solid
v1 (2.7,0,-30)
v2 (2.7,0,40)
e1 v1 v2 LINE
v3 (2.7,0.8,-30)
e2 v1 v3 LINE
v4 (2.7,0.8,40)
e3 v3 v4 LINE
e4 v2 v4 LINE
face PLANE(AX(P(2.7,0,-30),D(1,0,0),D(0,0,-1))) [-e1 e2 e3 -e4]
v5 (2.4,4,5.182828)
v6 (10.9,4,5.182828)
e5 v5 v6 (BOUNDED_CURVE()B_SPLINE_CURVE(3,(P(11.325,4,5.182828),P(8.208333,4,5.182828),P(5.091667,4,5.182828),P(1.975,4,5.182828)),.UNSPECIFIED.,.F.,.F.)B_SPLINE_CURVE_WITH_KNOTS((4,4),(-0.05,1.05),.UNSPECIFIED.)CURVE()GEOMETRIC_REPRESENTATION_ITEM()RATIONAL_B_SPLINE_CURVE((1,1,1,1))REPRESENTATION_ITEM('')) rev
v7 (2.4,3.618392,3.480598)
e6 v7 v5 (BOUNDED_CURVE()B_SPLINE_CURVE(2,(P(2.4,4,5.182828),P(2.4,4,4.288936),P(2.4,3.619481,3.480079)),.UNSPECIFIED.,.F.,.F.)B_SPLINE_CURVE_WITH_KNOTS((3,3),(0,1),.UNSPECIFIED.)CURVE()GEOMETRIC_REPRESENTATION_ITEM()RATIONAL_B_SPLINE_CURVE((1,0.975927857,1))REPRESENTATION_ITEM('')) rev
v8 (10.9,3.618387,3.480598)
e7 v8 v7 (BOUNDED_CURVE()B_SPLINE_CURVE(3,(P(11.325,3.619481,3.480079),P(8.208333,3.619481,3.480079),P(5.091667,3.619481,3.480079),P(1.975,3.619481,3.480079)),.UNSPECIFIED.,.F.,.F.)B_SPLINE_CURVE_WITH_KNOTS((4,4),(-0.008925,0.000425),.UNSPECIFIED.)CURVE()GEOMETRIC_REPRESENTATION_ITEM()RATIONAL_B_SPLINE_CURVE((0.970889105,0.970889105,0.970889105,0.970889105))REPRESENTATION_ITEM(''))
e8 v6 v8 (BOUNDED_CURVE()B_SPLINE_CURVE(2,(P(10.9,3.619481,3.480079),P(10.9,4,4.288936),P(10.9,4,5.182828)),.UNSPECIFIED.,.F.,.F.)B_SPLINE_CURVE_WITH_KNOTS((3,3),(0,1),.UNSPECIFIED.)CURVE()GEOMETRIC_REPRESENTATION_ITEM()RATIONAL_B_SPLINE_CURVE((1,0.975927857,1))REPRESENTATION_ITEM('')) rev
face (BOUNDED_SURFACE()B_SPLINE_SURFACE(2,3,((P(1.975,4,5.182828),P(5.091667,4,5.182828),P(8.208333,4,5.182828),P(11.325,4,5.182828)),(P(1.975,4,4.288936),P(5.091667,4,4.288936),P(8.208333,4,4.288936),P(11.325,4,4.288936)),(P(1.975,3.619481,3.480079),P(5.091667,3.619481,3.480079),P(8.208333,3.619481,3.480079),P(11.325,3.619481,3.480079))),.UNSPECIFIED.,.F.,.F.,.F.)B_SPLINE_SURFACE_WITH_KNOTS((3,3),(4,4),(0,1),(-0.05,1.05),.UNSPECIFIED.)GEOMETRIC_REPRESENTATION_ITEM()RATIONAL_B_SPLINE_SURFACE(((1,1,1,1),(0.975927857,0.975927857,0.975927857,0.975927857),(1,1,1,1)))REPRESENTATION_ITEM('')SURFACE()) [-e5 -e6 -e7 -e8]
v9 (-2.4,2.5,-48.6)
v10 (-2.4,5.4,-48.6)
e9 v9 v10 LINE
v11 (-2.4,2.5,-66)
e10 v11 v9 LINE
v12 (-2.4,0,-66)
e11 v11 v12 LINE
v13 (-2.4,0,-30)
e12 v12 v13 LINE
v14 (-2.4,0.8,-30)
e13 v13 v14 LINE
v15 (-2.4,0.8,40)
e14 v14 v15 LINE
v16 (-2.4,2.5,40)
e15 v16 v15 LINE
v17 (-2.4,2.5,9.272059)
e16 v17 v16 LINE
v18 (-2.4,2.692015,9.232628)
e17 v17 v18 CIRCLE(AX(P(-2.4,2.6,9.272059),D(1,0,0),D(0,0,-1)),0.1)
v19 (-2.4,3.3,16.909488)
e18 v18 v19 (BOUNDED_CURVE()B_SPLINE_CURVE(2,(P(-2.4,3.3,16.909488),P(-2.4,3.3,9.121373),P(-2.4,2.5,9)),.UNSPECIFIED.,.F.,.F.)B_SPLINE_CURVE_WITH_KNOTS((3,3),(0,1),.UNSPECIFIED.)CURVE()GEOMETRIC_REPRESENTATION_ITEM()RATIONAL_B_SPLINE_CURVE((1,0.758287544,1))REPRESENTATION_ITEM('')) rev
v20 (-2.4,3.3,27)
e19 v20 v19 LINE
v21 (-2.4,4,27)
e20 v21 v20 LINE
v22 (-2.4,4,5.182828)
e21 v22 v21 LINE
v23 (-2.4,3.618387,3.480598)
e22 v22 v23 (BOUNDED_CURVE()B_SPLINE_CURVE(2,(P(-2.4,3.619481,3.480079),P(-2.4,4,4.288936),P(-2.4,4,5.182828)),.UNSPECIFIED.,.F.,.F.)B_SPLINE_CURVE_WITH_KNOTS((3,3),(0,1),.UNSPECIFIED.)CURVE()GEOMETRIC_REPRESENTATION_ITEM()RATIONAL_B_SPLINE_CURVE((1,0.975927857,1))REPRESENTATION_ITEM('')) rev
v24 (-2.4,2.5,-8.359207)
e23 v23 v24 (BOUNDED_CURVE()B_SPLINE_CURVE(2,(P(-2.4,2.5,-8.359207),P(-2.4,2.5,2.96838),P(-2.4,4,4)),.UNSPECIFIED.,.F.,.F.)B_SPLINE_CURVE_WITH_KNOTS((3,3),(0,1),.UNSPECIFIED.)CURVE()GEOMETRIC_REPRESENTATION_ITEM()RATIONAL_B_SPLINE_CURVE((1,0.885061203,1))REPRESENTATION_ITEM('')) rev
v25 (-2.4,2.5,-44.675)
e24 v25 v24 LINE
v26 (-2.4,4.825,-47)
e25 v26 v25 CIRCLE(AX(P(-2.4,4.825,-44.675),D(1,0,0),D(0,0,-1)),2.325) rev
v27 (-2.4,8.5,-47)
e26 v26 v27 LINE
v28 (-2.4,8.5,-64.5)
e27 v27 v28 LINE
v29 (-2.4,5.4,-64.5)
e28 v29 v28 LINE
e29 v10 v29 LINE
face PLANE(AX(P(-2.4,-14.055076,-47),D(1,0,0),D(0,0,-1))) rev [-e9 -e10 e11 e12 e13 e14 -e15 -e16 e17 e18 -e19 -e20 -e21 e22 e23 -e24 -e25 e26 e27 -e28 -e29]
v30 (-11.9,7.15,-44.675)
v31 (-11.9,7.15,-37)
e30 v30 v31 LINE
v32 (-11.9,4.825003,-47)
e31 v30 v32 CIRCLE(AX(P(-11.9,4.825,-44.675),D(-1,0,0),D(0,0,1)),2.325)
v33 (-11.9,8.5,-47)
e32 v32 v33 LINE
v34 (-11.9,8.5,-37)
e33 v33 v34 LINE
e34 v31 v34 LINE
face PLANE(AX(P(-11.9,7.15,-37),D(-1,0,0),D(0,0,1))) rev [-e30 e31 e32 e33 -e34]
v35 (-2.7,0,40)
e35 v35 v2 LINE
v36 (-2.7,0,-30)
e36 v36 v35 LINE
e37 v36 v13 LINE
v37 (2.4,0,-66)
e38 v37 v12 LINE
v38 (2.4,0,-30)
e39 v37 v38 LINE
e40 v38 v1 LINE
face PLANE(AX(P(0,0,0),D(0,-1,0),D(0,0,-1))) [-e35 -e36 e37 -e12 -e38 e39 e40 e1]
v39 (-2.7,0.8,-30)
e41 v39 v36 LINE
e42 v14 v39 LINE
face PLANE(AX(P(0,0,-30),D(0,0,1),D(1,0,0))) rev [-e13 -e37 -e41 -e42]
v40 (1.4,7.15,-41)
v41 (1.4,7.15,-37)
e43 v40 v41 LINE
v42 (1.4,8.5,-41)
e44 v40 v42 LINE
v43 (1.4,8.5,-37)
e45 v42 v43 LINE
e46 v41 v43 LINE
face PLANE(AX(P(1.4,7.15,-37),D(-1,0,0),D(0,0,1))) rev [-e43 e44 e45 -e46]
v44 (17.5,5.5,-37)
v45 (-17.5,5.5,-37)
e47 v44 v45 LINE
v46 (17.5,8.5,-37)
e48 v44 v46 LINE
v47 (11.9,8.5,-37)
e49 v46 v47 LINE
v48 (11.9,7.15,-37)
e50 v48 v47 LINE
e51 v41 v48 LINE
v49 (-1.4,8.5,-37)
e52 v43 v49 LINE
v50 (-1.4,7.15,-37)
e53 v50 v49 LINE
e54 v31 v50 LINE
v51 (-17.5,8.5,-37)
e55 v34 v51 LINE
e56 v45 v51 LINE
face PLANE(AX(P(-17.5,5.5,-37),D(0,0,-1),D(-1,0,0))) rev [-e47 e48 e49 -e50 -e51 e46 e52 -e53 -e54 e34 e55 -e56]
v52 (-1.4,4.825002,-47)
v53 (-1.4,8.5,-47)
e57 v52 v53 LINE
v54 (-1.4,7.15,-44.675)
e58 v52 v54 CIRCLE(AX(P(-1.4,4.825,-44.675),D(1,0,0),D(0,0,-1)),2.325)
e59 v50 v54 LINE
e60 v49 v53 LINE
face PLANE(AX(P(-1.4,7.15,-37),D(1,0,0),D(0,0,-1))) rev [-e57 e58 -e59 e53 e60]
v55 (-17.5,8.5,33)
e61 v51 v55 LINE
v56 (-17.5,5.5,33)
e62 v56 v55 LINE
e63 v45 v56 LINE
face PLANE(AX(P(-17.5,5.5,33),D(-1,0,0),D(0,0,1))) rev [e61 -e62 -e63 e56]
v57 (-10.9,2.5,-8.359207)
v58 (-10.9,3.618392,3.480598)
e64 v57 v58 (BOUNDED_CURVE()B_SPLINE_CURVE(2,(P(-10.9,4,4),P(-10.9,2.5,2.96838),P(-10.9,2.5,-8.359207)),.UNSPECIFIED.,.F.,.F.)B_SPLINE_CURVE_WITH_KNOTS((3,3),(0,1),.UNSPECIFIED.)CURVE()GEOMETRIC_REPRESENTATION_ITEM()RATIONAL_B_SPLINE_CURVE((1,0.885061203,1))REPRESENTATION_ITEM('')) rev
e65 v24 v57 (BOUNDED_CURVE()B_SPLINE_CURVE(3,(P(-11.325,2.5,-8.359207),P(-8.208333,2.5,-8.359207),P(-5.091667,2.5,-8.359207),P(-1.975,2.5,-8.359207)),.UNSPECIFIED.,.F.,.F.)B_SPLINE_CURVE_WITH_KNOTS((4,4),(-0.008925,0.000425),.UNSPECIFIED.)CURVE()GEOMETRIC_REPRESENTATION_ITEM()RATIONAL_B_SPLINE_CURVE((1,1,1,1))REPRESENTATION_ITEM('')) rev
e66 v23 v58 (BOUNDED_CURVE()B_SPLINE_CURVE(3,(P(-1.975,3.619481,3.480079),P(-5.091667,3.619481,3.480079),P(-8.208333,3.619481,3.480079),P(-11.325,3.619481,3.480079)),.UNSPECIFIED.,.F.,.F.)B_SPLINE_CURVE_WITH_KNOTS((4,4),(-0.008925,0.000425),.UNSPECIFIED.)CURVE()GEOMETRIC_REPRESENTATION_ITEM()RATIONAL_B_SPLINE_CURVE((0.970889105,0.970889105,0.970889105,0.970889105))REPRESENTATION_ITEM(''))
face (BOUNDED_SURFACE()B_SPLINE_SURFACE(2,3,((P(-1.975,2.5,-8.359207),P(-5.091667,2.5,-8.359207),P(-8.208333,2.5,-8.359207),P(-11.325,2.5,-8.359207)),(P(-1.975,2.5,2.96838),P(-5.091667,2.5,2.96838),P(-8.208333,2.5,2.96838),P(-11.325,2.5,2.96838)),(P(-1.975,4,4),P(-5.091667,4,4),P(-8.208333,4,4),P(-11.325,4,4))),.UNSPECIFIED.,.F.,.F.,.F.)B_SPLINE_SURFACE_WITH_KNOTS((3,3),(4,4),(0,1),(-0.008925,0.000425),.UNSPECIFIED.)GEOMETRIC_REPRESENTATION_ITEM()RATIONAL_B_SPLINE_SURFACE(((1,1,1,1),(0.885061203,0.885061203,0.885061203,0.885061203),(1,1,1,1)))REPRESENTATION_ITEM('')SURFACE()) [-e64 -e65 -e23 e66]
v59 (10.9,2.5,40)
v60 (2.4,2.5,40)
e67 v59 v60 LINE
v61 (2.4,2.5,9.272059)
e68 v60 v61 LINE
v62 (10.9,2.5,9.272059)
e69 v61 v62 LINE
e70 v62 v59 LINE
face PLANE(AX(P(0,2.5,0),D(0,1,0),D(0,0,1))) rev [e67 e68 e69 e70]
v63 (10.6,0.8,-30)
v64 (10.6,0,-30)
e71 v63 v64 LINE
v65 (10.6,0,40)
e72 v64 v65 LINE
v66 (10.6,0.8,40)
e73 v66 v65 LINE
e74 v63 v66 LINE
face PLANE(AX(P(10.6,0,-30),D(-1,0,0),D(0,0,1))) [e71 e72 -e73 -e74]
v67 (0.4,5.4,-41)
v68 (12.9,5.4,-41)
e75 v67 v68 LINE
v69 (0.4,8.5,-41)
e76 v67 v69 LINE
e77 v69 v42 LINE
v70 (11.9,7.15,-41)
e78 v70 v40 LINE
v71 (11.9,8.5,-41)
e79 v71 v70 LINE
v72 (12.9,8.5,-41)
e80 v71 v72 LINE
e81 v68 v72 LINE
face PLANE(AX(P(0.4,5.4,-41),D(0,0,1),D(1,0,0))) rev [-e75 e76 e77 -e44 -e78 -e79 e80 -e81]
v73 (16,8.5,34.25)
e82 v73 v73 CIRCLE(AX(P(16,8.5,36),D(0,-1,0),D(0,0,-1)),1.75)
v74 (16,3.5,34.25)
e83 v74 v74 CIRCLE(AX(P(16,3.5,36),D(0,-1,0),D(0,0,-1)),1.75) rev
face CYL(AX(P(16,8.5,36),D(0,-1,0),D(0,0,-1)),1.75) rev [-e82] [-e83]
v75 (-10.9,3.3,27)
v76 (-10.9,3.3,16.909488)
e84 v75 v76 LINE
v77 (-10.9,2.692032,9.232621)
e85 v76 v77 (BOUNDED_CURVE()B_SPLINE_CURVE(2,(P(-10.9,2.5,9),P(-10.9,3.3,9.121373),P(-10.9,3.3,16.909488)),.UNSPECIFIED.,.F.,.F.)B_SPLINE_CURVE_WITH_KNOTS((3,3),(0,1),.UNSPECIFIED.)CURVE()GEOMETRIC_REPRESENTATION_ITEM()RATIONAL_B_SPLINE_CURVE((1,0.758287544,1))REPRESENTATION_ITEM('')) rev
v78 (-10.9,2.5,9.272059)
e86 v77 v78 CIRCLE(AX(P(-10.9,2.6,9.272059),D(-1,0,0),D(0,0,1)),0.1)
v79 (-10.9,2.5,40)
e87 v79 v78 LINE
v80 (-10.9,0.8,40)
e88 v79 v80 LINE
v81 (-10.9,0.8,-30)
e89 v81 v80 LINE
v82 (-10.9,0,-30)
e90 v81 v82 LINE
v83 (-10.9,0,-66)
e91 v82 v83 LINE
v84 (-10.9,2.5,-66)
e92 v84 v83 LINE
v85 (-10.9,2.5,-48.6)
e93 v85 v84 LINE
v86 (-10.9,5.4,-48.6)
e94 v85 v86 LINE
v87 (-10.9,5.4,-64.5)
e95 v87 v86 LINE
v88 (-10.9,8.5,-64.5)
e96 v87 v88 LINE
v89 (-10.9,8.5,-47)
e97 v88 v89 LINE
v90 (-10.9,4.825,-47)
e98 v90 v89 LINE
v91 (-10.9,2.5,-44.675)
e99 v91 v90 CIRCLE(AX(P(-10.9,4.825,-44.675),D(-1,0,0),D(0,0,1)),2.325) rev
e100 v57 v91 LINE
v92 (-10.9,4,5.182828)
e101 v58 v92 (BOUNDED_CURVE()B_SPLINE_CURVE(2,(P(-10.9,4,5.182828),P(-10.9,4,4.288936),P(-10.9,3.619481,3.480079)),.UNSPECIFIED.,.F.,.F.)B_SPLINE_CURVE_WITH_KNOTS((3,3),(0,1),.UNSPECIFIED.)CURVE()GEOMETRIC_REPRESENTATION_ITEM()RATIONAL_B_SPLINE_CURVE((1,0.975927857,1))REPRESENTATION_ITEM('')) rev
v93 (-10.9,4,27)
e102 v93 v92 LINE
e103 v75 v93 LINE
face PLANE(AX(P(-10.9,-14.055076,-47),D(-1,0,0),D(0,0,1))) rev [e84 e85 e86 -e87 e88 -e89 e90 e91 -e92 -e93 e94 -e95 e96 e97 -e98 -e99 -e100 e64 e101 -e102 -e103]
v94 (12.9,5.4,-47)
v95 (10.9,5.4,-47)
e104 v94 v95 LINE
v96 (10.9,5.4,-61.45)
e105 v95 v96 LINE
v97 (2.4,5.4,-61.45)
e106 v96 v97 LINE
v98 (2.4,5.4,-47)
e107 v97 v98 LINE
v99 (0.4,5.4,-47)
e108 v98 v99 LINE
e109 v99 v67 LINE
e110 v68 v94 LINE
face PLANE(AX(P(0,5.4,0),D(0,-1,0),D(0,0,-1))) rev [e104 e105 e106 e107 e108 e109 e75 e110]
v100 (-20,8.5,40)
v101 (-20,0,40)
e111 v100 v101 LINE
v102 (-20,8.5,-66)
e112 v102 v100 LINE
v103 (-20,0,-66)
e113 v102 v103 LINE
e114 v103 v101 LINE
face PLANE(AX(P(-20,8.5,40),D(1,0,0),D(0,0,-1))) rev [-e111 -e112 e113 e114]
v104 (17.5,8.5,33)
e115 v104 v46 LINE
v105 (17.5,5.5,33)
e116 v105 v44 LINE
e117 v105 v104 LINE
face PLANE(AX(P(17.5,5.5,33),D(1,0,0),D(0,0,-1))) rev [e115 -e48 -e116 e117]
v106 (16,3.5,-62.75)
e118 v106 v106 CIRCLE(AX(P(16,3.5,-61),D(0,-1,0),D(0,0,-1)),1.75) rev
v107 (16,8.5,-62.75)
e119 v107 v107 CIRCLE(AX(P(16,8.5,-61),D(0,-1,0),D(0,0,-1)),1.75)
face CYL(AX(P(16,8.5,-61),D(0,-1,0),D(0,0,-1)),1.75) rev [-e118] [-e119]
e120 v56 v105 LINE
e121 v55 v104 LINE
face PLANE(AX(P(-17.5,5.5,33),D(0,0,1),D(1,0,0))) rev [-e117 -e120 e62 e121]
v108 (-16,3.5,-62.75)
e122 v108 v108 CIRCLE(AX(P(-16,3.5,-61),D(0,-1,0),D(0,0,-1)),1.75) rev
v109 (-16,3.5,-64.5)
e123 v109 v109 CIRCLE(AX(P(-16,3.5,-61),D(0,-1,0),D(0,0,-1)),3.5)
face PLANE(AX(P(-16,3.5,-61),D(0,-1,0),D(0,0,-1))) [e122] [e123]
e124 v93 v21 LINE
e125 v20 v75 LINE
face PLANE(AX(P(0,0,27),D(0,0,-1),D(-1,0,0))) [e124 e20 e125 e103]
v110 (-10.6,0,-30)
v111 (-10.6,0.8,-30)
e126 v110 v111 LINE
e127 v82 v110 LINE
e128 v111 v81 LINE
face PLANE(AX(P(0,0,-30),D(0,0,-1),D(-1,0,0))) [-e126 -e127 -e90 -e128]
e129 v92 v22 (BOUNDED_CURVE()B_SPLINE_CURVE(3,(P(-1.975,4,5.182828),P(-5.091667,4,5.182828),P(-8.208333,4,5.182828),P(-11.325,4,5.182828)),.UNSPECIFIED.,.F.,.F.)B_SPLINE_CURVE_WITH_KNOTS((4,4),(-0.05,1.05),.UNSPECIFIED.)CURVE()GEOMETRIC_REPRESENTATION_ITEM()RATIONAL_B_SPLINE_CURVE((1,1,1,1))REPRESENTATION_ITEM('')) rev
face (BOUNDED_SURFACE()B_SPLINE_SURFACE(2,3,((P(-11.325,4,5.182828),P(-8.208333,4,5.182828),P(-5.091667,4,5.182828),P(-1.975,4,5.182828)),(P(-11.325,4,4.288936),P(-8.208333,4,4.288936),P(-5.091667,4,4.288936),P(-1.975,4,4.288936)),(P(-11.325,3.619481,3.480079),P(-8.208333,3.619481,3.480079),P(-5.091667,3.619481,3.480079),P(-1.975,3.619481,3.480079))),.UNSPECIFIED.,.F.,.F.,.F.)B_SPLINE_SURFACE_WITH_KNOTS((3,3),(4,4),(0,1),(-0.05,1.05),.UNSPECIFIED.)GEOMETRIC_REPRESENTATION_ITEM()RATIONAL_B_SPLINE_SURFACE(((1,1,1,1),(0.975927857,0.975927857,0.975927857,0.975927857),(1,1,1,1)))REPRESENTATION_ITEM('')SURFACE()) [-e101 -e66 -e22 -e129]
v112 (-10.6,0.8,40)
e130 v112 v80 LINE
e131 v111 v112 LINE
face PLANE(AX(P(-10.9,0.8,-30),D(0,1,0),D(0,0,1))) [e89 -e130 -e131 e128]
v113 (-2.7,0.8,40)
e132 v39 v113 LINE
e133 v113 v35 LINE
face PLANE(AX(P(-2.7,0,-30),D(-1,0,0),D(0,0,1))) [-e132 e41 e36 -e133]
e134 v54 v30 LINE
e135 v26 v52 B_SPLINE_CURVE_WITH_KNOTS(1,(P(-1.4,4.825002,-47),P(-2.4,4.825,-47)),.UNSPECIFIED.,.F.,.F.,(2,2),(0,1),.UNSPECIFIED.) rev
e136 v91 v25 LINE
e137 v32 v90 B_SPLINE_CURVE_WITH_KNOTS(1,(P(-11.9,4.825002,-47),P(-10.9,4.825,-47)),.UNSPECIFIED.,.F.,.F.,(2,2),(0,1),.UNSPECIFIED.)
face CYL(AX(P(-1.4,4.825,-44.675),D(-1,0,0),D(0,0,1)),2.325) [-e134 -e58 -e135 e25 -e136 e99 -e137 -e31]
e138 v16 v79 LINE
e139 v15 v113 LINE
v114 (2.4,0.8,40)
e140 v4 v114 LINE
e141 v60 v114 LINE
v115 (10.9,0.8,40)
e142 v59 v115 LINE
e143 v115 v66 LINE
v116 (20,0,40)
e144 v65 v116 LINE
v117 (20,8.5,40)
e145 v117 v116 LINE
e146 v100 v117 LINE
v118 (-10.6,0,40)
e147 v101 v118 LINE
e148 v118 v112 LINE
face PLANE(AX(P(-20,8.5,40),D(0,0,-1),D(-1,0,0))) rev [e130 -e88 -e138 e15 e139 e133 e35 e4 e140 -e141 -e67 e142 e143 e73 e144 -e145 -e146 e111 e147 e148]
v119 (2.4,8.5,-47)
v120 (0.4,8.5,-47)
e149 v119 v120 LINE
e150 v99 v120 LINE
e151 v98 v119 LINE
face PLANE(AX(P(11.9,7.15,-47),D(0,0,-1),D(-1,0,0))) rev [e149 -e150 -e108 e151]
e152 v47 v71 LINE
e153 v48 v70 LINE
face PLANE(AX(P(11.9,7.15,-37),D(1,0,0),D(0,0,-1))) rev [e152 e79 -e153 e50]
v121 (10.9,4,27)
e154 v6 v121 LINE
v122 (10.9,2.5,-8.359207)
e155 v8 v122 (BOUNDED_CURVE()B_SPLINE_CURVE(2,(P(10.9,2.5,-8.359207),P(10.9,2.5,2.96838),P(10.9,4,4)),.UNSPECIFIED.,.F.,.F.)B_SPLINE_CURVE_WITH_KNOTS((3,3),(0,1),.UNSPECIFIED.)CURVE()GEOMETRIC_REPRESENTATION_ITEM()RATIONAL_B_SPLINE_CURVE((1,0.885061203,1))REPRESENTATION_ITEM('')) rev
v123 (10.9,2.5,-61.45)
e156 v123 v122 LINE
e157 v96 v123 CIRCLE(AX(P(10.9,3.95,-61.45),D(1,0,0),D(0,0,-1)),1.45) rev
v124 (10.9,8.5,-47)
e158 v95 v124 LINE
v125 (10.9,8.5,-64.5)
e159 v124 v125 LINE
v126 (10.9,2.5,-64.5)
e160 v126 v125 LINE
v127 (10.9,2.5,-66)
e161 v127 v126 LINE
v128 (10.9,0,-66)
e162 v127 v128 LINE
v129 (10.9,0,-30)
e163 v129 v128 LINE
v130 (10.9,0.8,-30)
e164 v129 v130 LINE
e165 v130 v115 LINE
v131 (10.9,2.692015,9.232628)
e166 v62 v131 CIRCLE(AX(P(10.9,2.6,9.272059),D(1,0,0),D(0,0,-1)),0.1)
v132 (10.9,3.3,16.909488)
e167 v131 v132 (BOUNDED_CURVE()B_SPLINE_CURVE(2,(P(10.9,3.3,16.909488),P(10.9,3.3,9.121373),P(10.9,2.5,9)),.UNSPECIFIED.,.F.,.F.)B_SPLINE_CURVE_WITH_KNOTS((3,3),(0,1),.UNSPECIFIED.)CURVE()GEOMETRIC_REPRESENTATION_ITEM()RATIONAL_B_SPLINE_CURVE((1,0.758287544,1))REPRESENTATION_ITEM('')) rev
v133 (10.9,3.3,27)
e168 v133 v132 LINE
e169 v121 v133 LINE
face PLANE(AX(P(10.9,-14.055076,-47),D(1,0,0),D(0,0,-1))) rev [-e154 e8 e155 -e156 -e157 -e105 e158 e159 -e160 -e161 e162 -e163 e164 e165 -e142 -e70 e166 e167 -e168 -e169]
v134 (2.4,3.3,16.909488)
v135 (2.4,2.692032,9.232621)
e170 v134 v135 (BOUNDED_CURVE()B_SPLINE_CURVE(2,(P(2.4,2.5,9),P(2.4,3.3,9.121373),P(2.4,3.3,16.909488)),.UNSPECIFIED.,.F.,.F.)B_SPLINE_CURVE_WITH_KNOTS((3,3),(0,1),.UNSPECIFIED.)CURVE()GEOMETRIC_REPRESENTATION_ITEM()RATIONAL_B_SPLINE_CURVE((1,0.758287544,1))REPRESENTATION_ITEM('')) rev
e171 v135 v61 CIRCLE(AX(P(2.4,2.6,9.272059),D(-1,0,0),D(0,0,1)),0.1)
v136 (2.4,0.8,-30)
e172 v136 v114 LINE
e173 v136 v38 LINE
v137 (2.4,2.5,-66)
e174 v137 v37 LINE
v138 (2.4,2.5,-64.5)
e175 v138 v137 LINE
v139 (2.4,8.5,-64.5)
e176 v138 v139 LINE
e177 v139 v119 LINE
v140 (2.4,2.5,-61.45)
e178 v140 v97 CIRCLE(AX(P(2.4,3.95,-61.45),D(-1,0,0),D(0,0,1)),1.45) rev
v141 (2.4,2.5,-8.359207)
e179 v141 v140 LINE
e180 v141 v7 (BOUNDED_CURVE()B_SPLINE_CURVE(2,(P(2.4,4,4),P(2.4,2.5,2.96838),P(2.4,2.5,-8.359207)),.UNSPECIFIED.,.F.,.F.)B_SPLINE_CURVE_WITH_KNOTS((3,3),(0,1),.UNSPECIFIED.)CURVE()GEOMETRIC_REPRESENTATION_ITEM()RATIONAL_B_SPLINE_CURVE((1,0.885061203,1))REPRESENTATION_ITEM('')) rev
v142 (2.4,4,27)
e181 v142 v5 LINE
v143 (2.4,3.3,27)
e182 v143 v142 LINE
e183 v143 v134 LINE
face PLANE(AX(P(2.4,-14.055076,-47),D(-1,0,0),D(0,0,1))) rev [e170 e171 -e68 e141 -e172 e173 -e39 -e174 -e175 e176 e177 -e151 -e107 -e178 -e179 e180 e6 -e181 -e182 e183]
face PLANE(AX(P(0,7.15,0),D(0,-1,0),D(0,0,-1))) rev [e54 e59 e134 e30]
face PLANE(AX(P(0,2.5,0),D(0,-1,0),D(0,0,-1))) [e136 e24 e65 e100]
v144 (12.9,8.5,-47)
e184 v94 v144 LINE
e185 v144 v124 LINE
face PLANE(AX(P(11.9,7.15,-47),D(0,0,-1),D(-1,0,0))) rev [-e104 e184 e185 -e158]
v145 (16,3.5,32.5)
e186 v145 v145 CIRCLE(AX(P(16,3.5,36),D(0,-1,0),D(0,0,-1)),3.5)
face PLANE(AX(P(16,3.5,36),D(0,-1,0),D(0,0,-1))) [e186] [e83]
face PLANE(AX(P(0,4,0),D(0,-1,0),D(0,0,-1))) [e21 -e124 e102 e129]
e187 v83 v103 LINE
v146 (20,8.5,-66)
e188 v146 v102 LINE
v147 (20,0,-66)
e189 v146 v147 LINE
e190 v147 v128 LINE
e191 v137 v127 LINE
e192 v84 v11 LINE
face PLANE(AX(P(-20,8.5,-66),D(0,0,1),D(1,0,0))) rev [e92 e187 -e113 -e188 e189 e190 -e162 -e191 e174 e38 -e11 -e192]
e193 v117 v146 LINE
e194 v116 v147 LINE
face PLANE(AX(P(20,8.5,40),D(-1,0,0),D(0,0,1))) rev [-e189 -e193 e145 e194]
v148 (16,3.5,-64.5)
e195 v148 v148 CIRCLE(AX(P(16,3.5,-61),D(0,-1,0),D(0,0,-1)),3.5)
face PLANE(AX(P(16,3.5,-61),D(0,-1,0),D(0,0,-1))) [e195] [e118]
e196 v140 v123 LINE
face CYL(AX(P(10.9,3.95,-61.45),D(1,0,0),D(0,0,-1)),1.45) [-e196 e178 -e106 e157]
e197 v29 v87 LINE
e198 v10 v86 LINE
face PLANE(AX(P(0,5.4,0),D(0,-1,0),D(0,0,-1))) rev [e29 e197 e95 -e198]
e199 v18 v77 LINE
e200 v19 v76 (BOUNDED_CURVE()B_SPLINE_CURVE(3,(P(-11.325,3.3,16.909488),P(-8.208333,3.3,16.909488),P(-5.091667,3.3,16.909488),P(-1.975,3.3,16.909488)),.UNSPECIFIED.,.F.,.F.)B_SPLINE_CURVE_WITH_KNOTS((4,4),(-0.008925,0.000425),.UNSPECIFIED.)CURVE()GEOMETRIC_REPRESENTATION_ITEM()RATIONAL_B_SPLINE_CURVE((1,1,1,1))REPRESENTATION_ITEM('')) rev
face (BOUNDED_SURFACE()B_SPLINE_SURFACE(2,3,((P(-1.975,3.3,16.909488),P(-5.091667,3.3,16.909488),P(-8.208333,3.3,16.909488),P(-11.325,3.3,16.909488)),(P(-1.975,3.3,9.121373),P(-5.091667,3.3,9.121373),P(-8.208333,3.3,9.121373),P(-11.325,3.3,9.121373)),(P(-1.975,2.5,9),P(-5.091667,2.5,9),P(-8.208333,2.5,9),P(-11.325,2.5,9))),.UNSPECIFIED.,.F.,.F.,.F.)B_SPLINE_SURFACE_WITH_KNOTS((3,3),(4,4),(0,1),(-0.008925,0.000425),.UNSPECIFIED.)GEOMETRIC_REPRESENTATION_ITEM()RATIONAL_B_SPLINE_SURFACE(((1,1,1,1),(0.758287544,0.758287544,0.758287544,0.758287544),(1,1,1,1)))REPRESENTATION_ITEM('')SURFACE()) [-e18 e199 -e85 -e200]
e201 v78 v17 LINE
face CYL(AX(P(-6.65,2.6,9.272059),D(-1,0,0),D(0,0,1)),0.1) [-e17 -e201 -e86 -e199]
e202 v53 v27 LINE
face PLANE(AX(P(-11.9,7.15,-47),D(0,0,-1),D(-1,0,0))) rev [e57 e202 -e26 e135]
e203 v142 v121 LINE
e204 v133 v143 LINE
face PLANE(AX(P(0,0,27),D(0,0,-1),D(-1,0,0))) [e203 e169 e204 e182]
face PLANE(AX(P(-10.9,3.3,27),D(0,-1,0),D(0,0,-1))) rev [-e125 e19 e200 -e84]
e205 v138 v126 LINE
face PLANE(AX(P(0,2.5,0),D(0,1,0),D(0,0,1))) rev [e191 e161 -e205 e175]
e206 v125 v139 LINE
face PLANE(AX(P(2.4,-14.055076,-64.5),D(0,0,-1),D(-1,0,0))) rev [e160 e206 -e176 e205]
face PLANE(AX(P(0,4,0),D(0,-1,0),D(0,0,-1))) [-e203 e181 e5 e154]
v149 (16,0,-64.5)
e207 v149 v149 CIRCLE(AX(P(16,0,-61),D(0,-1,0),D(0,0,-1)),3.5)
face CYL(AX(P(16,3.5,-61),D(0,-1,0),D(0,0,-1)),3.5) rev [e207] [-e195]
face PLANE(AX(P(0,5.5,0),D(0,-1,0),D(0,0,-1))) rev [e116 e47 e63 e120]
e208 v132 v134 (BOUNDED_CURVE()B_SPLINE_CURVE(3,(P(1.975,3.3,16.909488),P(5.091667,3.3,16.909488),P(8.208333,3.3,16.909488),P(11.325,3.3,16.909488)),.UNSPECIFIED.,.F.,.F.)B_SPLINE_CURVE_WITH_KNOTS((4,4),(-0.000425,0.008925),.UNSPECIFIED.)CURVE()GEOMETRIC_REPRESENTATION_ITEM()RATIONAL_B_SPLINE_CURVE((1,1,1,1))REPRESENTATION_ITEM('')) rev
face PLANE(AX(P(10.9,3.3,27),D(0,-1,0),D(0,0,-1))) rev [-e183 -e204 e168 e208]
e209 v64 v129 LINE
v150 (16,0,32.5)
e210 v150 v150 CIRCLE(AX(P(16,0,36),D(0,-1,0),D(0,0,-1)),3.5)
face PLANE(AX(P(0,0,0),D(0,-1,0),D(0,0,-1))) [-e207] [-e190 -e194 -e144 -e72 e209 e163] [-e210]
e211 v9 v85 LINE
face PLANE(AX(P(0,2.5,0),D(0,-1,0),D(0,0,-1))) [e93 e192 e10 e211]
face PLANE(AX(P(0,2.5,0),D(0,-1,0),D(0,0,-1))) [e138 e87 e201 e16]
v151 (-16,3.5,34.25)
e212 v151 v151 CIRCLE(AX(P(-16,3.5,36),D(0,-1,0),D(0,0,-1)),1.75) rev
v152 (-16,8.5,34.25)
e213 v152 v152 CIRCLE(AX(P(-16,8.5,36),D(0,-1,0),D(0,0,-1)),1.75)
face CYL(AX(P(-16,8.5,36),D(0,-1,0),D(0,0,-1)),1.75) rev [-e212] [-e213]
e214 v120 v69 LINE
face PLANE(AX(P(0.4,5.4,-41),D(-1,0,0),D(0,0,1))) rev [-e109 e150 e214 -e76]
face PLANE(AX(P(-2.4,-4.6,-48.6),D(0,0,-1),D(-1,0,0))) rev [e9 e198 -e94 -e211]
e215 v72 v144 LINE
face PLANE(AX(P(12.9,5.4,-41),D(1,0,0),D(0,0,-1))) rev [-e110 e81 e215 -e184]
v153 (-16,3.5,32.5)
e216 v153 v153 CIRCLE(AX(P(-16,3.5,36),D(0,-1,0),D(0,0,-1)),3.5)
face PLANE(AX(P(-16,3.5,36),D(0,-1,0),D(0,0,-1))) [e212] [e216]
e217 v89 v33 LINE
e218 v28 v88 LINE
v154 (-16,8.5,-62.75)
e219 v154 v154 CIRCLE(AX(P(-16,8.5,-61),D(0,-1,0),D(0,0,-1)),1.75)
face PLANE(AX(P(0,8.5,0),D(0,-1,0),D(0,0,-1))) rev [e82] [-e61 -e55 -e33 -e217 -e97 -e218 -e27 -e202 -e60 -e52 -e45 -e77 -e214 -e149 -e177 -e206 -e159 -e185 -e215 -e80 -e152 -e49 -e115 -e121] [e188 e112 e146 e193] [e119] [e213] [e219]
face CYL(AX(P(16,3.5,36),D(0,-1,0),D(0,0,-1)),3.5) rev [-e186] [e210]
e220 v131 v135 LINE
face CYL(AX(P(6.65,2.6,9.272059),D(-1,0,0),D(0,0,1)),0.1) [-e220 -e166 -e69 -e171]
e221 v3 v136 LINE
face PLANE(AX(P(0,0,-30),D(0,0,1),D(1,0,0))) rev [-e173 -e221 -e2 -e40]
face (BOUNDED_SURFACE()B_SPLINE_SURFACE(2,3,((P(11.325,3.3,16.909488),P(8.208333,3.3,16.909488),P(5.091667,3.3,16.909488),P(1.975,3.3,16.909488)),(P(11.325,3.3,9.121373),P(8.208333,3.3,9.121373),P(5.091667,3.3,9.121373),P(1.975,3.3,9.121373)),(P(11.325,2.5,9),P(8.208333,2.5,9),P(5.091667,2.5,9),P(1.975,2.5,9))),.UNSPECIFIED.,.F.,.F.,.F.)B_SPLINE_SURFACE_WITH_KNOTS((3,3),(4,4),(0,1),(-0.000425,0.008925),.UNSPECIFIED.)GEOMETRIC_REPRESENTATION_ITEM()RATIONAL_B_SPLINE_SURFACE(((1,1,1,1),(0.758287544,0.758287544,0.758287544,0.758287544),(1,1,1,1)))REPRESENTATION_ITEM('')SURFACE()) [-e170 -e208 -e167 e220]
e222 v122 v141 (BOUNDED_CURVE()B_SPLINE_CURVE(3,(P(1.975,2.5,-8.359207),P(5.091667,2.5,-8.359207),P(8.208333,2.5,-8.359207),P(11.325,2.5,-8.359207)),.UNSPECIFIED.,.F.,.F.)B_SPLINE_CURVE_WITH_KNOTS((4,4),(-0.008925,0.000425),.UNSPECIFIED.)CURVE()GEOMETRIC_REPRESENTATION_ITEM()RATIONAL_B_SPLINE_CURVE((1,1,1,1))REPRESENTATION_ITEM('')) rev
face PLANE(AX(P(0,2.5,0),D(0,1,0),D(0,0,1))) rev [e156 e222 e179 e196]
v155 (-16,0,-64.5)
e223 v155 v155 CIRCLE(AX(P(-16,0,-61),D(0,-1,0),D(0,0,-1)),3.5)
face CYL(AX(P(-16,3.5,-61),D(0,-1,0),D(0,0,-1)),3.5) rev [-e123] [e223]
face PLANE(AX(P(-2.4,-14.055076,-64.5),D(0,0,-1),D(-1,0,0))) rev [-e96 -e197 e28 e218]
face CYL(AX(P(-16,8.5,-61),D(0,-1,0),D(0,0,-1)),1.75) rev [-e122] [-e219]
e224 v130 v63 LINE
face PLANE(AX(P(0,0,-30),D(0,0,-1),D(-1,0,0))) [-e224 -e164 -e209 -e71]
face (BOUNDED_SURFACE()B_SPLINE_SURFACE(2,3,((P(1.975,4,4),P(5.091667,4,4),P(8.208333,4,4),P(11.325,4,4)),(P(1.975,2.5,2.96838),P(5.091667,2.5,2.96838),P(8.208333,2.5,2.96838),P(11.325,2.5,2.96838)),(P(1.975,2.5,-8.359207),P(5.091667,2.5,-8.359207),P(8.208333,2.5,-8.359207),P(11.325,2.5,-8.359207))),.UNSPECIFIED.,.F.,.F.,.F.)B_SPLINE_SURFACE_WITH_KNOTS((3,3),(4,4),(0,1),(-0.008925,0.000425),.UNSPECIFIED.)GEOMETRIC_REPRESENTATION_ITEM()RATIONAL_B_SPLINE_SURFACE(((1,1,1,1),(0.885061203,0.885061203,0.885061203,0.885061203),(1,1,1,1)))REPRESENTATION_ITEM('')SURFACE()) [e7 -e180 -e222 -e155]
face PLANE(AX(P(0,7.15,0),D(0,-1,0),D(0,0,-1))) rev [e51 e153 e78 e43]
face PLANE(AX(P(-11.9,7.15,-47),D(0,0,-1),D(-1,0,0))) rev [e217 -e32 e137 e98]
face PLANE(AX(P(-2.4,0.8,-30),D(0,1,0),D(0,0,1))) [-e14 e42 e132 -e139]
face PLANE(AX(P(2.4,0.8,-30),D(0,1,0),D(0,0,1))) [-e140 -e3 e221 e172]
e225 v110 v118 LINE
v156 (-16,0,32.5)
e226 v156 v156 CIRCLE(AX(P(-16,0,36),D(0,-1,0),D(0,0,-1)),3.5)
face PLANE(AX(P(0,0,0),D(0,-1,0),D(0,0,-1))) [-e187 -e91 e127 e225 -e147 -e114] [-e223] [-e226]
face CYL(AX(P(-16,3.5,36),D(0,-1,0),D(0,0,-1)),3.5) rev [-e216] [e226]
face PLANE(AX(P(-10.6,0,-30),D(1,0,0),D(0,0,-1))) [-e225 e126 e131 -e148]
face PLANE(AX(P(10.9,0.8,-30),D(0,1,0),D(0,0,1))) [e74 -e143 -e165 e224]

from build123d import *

# Parameters (mm, degrees)
SKETCH1_W                  = 40
SKETCH1_H                  = 106
BOSS_EXTRUDE1_DEPTH        = 8.5
SKETCH2_W                  = 35
SKETCH2_H                  = 70
CUT_EXTRUDE1_DEPTH         = 3
SKETCH3_W                  = 10.5
SKETCH3_H                  = 10
CUT_EXTRUDE2_DEPTH         = 1.35
SKETCH4_W                  = 12.5
SKETCH4_H                  = 6
CUT_EXTRUDE3_DEPTH         = 3.1
SKETCH5_W                  = 8.5
SKETCH5_H                  = 17.5
PCB_PLACE_DEPTH            = 3.1
SKETCH6_W                  = 8.5
SKETCH6_H                  = 1.6
NICKEL_STRIP_HOLE_DEPTH    = 70.174850921
CUT_EXTRUDE4_REACH         = 71.486
SKETCH7_W                  = 8.5
SKETCH7_H                  = 17.5
SKETCH8_W                  = 8.5
SKETCH8_H                  = 1.6
CUT_EXTRUDE5_DEPTH         = 10
SKETCH9_W                  = 8.5
SKETCH9_H                  = 106
NICKEL_STRIP_RAIL_DEPTH    = 2.5
FILLET3_R                  = 2.325
FILLET4_RADIUS             = 1.45
FILLET4_LENGTH             = 8.5
SKETCH10_W                 = 8.5
SKETCH10_H                 = 5
CUT_EXTRUDE6_DEPTH         = 1.5
SKETCH11_W                 = 8.5
SKETCH11_H                 = 0.7
NICKELSTRIPINSERTION_DEPTH = 18
FILLET5_INSERTION_START    = -10.9
FILLET5_INSERTION_DEPTH    = 8.5
FILLET5_INSERTION_START_2  = 2.4
FILLET5_INSERTION_2_DEPTH  = 8.5
FILLET7_AMEND_R            = 4
FILLET6_START              = -10.9
FILLET6_DEPTH              = 8.5
FILLET6_START_2            = 2.4
FILLET6_2_DEPTH            = 8.5
FILLET8_ROUNDING_R         = 0.1
SKETCH12_W                 = 0.3
SKETCH12_H                 = 0.8
STRIPRAIL_DEPTH            = 70
SKETCH13_R                 = 1.75
SCREW_HOLES_DEPTH          = 70.485610128
SKETCH14_R                 = 3.5
SCREW_HEAD_HOLES_TBM_DEPTH = 3.5


with BuildPart() as part:
    # Sketch1 → Boss-Extrude1 (new body)
    with BuildSketch(Plane(origin=(0, 0, 0), x_dir=(1, 0, 0), z_dir=(0, 1, 0))):
        with Locations((0, 13)):
            Rectangle(SKETCH1_W, SKETCH1_H)
    extrude(amount=BOSS_EXTRUDE1_DEPTH)

    # Sketch2 → Cut-Extrude1 (cut)
    with BuildSketch(Plane(origin=(0, 8.5, 0), x_dir=(1, 0, 0), z_dir=(0, 1, 0))):
        with Locations((0, 2)):
            Rectangle(SKETCH2_W, SKETCH2_H)
    extrude(amount=-CUT_EXTRUDE1_DEPTH, mode=Mode.SUBTRACT)

    # Sketch3 → Cut-Extrude2 (cut)
    with BuildSketch(Plane(origin=(0, 8.5, 0), x_dir=(1, 0, 0), z_dir=(0, 1, 0))):
        with Locations((-6.65, 42)):
            Rectangle(SKETCH3_W, SKETCH3_H)
        with Locations((6.65, 42)):
            Rectangle(SKETCH3_W, SKETCH3_H)
    extrude(amount=-CUT_EXTRUDE2_DEPTH, mode=Mode.SUBTRACT)

    # Sketch4 → Cut-Extrude3 (cut)
    with BuildSketch(Plane(origin=(0, 8.5, 0), x_dir=(1, 0, 0), z_dir=(0, 1, 0))):
        with Locations((6.65, 44)):
            Rectangle(SKETCH4_W, SKETCH4_H)
    extrude(amount=-CUT_EXTRUDE3_DEPTH, mode=Mode.SUBTRACT)

    # Sketch5 → PCB place (cut)
    with BuildSketch(Plane(origin=(0, 8.5, 0), x_dir=(1, 0, 0), z_dir=(0, 1, 0))):
        with Locations((6.65, 55.75)):
            Rectangle(SKETCH5_W, SKETCH5_H)
    extrude(amount=-PCB_PLACE_DEPTH, mode=Mode.SUBTRACT)

    # Sketch6 → Nickel strip hole (cut, through all)
    with BuildSketch(Plane(origin=(0, 5.4, 0), x_dir=(1, 0, 0), z_dir=(0, 1, 0))):
        with Locations((6.65, 63.7)):
            Rectangle(SKETCH6_W, SKETCH6_H)
    extrude(amount=-NICKEL_STRIP_HOLE_DEPTH, mode=Mode.SUBTRACT)

    # Cut-Extrude4: up to this face of the body (flat: up to its plane)
    cut_extrude4_end = Plane(part.part.faces().sort_by_distance((6.65, 5.4, -51.042077088))[0])
    # Sketch7 → Cut-Extrude4 (cut, up to the picked face)
    with BuildSketch(Plane(origin=(0, 8.5, 0), x_dir=(1, 0, 0), z_dir=(0, 1, 0)), mode=Mode.PRIVATE) as cut_extrude4_sk1:
        with Locations((-6.65, 55.75)):
            Rectangle(SKETCH7_W, SKETCH7_H)
    cut_extrude4_tool1 = split(extrude(cut_extrude4_sk1.sketch, amount=-CUT_EXTRUDE4_REACH, mode=Mode.PRIVATE), bisect_by=cut_extrude4_end, keep=Keep.BOTH, mode=Mode.PRIVATE)
    add(cut_extrude4_tool1.solids().sort_by(Axis((-6.65, 8.5, -55.75), (0, -1, 0)))[0], mode=Mode.SUBTRACT)

    # Sketch8 → Cut-Extrude5 (cut)
    with BuildSketch(Plane(origin=(0, 5.4, 0), x_dir=(1, 0, 0), z_dir=(0, 1, 0))):
        with Locations((-6.65, 47.8)):
            Rectangle(SKETCH8_W, SKETCH8_H)
    extrude(amount=-CUT_EXTRUDE5_DEPTH, mode=Mode.SUBTRACT)

    # Sketch9 → Nickel strip rail (cut)
    with BuildSketch(Plane.XZ):
        with Locations((-6.65, -13)):
            Rectangle(SKETCH9_W, SKETCH9_H)
        with Locations((6.65, -13)):
            Rectangle(SKETCH9_W, SKETCH9_H)
    extrude(amount=-NICKEL_STRIP_RAIL_DEPTH, mode=Mode.SUBTRACT)

    # Fillet3
    # the kernel refuses this fillet: 2.325 mm, written as the material it takes off along each edge
    with BuildSketch(Plane(origin=(3.4125, 7.15, -47), x_dir=(0, 0, 1), z_dir=(-1, 0, 0))) as fillet3_piece_1_section:
        with BuildLine():
            CenterArc((FILLET3_R, -FILLET3_R), FILLET3_R, 90, 90)
            Line((0, -FILLET3_R), (0, 0))
            Line((0, 0), (FILLET3_R, 0))
        make_face()
    fillet3_piece_1 = extrude(amount=20.125, mode=Mode.PRIVATE)
    fillet3_piece_1 = split(fillet3_piece_1, bisect_by=Plane(origin=(-11.9, 7.15, -47), z_dir=(1, 0, 0)), keep=Keep.TOP, mode=Mode.PRIVATE)
    fillet3_piece_1 = split(fillet3_piece_1, bisect_by=Plane(origin=(-1.4, 7.15, -47), z_dir=(-1, 0, 0)), keep=Keep.TOP, mode=Mode.PRIVATE)
    add(fillet3_piece_1, mode=Mode.SUBTRACT)
    with BuildSketch(Plane(origin=(-10.9, 2.5, -47), x_dir=(0, 1, 0), z_dir=(1, 0, 0))) as fillet3_piece_2:
        with BuildLine():
            CenterArc((FILLET3_R, FILLET3_R), FILLET3_R, 180, 90)
            Line((0, FILLET3_R), (0, 0))
            Line((0, 0), (FILLET3_R, 0))
        make_face()
    extrude(amount=8.5, mode=Mode.SUBTRACT)

    # Fillet4: full round fillet: the end face becomes a half cylinder, R = half its width
    fillet4_face = Plane((6.65, 3.95, -62.9), x_dir=(1, 0, 0), z_dir=(0, 0, -1))  # on the end face: x along it, z out of the body
    fillet4_slab = fillet4_face.offset(-FILLET4_RADIUS / 2) * Box(FILLET4_LENGTH, 2 * FILLET4_RADIUS, FILLET4_RADIUS, mode=Mode.PRIVATE)  # the body's end, R deep
    fillet4_round = Plane((6.65, 3.95, -61.45), x_dir=(0, 0, -1), z_dir=(1, 0, 0)) * Cylinder(FILLET4_RADIUS, FILLET4_LENGTH, mode=Mode.PRIVATE)  # its axis R under the face
    add(fillet4_slab - fillet4_round, mode=Mode.SUBTRACT)

    # Sketch10 → Cut-Extrude6 (cut)
    with BuildSketch(Plane.XZ.offset(-2.5)):
        with Locations((6.65, 6.5)):
            Rectangle(SKETCH10_W, SKETCH10_H)
        with Locations((-6.65, 6.5)):
            Rectangle(SKETCH10_W, SKETCH10_H)
    extrude(amount=-CUT_EXTRUDE6_DEPTH, mode=Mode.SUBTRACT)

    # Sketch11 → NickelStripInsertion (cut)
    with BuildSketch(Plane(origin=(0, 0, 9), x_dir=(-1, 0, 0), z_dir=(0, 0, -1))):
        with Locations((-6.65, 3.65)):
            Rectangle(SKETCH11_W, SKETCH11_H)
        with Locations((6.65, 3.65)):
            Rectangle(SKETCH11_W, SKETCH11_H)
    extrude(amount=-NICKELSTRIPINSERTION_DEPTH, mode=Mode.SUBTRACT)

    # Fillet5_insertion: read off the stored shape, not the designer's step
    # Fillet5_insertion outline → Fillet5_insertion (cut)
    with BuildSketch(Plane.YZ.offset(FILLET5_INSERTION_START)):
        with BuildLine():
            Line((2.5, 4), (2.5, -8.359207094))
            add(Edge.make_bspline(
                [(2.5, -8.359207094), (2.5, 2.968380423), (4, 4)],
                knots=[0, 0, 0, 1, 1, 1], degree=2, weights=[1, 0.885061203, 1]))
            Line((4, 4), (2.5, 4))
        make_face()
    extrude(amount=FILLET5_INSERTION_DEPTH, mode=Mode.SUBTRACT)

    # Fillet5_insertion 2 outline → Fillet5_insertion 2 (cut)
    with BuildSketch(Plane.YZ.offset(FILLET5_INSERTION_START_2)):
        with BuildLine():
            Line((2.5, 4), (2.5, -8.359207094))
            add(Edge.make_bspline(
                [(2.5, -8.359207094), (2.5, 2.968380423), (4, 4)],
                knots=[0, 0, 0, 1, 1, 1], degree=2, weights=[1, 0.885061203, 1]))
            Line((4, 4), (2.5, 4))
        make_face()
    extrude(amount=FILLET5_INSERTION_2_DEPTH, mode=Mode.SUBTRACT)

    # Fillet7_amend
    fillet7_amend_edges = [part.edges().sort_by_distance(p)[0] for p in [
        (6.65, 4, 4),
        (-6.65, 4, 4),
    ]]
    fillet(fillet7_amend_edges, radius=FILLET7_AMEND_R)

    # Fillet6: read off the stored shape, not the designer's step
    # Fillet6 outline → Fillet6 (cut)
    with BuildSketch(Plane.YZ.offset(FILLET6_START)):
        with BuildLine():
            Line((3.3, 9), (3.3, 16.909487973))
            add(Edge.make_bspline(
                [(3.3, 16.909487973), (3.3, 9.121373217), (2.5, 9)],
                knots=[0, 0, 0, 1, 1, 1], degree=2, weights=[1, 0.758287544, 1]))
            Line((2.5, 9), (3.3, 9))
        make_face()
    extrude(amount=FILLET6_DEPTH, mode=Mode.SUBTRACT)

    # Fillet6 2 outline → Fillet6 2 (cut)
    with BuildSketch(Plane.YZ.offset(FILLET6_START_2)):
        with BuildLine():
            Line((3.3, 9), (3.3, 16.909487973))
            add(Edge.make_bspline(
                [(3.3, 16.909487973), (3.3, 9.121373217), (2.5, 9)],
                knots=[0, 0, 0, 1, 1, 1], degree=2, weights=[1, 0.758287544, 1]))
            Line((2.5, 9), (3.3, 9))
        make_face()
    extrude(amount=FILLET6_2_DEPTH, mode=Mode.SUBTRACT)

    # Fillet8_rounding
    fillet8_rounding_edges = [part.edges().sort_by_distance(p)[0] for p in [
        (-6.65, 2.5, 9),
        (6.65, 2.5, 9),
    ]]
    fillet(fillet8_rounding_edges, radius=FILLET8_ROUNDING_R)

    # Sketch12 → StripRail (add)
    with BuildSketch(Plane.XY.offset(40)):
        with Locations((2.55, 0.4)):
            Rectangle(SKETCH12_W, SKETCH12_H)
        with Locations((-10.75, 0.4)):
            Rectangle(SKETCH12_W, SKETCH12_H)
        with Locations((-2.55, 0.4)):
            Rectangle(SKETCH12_W, SKETCH12_H)
        with Locations((10.75, 0.4)):
            Rectangle(SKETCH12_W, SKETCH12_H)
    extrude(amount=-STRIPRAIL_DEPTH)

    # Sketch13 → Screw_Holes (cut, through all)
    with BuildSketch(Plane.XZ):
        with Locations(Location((-16, -61, 0), (0, 0, 270))):
            Circle(SKETCH13_R)
        with Locations(Location((16, -61, 0), (0, 0, 270))):
            Circle(SKETCH13_R)
        with Locations(Location((-16, 36, 0), (0, 0, 270))):
            Circle(SKETCH13_R)
        with Locations(Location((16, 36, 0), (0, 0, 270))):
            Circle(SKETCH13_R)
    extrude(amount=-SCREW_HOLES_DEPTH, mode=Mode.SUBTRACT)

    # Sketch14 → Screw_Head_Holes_TBM (cut)
    with BuildSketch(Plane.XZ):
        with Locations(Location((16, -61, 0), (0, 0, 270))):
            Circle(SKETCH14_R)
        with Locations(Location((-16, -61, 0), (0, 0, 270))):
            Circle(SKETCH14_R)
        with Locations(Location((16, 36, 0), (0, 0, 270))):
            Circle(SKETCH14_R)
        with Locations(Location((-16, 36, 0), (0, 0, 270))):
            Circle(SKETCH14_R)
    extrude(amount=-SCREW_HEAD_HOLES_TBM_DEPTH, mode=Mode.SUBTRACT)


solid = part.part
